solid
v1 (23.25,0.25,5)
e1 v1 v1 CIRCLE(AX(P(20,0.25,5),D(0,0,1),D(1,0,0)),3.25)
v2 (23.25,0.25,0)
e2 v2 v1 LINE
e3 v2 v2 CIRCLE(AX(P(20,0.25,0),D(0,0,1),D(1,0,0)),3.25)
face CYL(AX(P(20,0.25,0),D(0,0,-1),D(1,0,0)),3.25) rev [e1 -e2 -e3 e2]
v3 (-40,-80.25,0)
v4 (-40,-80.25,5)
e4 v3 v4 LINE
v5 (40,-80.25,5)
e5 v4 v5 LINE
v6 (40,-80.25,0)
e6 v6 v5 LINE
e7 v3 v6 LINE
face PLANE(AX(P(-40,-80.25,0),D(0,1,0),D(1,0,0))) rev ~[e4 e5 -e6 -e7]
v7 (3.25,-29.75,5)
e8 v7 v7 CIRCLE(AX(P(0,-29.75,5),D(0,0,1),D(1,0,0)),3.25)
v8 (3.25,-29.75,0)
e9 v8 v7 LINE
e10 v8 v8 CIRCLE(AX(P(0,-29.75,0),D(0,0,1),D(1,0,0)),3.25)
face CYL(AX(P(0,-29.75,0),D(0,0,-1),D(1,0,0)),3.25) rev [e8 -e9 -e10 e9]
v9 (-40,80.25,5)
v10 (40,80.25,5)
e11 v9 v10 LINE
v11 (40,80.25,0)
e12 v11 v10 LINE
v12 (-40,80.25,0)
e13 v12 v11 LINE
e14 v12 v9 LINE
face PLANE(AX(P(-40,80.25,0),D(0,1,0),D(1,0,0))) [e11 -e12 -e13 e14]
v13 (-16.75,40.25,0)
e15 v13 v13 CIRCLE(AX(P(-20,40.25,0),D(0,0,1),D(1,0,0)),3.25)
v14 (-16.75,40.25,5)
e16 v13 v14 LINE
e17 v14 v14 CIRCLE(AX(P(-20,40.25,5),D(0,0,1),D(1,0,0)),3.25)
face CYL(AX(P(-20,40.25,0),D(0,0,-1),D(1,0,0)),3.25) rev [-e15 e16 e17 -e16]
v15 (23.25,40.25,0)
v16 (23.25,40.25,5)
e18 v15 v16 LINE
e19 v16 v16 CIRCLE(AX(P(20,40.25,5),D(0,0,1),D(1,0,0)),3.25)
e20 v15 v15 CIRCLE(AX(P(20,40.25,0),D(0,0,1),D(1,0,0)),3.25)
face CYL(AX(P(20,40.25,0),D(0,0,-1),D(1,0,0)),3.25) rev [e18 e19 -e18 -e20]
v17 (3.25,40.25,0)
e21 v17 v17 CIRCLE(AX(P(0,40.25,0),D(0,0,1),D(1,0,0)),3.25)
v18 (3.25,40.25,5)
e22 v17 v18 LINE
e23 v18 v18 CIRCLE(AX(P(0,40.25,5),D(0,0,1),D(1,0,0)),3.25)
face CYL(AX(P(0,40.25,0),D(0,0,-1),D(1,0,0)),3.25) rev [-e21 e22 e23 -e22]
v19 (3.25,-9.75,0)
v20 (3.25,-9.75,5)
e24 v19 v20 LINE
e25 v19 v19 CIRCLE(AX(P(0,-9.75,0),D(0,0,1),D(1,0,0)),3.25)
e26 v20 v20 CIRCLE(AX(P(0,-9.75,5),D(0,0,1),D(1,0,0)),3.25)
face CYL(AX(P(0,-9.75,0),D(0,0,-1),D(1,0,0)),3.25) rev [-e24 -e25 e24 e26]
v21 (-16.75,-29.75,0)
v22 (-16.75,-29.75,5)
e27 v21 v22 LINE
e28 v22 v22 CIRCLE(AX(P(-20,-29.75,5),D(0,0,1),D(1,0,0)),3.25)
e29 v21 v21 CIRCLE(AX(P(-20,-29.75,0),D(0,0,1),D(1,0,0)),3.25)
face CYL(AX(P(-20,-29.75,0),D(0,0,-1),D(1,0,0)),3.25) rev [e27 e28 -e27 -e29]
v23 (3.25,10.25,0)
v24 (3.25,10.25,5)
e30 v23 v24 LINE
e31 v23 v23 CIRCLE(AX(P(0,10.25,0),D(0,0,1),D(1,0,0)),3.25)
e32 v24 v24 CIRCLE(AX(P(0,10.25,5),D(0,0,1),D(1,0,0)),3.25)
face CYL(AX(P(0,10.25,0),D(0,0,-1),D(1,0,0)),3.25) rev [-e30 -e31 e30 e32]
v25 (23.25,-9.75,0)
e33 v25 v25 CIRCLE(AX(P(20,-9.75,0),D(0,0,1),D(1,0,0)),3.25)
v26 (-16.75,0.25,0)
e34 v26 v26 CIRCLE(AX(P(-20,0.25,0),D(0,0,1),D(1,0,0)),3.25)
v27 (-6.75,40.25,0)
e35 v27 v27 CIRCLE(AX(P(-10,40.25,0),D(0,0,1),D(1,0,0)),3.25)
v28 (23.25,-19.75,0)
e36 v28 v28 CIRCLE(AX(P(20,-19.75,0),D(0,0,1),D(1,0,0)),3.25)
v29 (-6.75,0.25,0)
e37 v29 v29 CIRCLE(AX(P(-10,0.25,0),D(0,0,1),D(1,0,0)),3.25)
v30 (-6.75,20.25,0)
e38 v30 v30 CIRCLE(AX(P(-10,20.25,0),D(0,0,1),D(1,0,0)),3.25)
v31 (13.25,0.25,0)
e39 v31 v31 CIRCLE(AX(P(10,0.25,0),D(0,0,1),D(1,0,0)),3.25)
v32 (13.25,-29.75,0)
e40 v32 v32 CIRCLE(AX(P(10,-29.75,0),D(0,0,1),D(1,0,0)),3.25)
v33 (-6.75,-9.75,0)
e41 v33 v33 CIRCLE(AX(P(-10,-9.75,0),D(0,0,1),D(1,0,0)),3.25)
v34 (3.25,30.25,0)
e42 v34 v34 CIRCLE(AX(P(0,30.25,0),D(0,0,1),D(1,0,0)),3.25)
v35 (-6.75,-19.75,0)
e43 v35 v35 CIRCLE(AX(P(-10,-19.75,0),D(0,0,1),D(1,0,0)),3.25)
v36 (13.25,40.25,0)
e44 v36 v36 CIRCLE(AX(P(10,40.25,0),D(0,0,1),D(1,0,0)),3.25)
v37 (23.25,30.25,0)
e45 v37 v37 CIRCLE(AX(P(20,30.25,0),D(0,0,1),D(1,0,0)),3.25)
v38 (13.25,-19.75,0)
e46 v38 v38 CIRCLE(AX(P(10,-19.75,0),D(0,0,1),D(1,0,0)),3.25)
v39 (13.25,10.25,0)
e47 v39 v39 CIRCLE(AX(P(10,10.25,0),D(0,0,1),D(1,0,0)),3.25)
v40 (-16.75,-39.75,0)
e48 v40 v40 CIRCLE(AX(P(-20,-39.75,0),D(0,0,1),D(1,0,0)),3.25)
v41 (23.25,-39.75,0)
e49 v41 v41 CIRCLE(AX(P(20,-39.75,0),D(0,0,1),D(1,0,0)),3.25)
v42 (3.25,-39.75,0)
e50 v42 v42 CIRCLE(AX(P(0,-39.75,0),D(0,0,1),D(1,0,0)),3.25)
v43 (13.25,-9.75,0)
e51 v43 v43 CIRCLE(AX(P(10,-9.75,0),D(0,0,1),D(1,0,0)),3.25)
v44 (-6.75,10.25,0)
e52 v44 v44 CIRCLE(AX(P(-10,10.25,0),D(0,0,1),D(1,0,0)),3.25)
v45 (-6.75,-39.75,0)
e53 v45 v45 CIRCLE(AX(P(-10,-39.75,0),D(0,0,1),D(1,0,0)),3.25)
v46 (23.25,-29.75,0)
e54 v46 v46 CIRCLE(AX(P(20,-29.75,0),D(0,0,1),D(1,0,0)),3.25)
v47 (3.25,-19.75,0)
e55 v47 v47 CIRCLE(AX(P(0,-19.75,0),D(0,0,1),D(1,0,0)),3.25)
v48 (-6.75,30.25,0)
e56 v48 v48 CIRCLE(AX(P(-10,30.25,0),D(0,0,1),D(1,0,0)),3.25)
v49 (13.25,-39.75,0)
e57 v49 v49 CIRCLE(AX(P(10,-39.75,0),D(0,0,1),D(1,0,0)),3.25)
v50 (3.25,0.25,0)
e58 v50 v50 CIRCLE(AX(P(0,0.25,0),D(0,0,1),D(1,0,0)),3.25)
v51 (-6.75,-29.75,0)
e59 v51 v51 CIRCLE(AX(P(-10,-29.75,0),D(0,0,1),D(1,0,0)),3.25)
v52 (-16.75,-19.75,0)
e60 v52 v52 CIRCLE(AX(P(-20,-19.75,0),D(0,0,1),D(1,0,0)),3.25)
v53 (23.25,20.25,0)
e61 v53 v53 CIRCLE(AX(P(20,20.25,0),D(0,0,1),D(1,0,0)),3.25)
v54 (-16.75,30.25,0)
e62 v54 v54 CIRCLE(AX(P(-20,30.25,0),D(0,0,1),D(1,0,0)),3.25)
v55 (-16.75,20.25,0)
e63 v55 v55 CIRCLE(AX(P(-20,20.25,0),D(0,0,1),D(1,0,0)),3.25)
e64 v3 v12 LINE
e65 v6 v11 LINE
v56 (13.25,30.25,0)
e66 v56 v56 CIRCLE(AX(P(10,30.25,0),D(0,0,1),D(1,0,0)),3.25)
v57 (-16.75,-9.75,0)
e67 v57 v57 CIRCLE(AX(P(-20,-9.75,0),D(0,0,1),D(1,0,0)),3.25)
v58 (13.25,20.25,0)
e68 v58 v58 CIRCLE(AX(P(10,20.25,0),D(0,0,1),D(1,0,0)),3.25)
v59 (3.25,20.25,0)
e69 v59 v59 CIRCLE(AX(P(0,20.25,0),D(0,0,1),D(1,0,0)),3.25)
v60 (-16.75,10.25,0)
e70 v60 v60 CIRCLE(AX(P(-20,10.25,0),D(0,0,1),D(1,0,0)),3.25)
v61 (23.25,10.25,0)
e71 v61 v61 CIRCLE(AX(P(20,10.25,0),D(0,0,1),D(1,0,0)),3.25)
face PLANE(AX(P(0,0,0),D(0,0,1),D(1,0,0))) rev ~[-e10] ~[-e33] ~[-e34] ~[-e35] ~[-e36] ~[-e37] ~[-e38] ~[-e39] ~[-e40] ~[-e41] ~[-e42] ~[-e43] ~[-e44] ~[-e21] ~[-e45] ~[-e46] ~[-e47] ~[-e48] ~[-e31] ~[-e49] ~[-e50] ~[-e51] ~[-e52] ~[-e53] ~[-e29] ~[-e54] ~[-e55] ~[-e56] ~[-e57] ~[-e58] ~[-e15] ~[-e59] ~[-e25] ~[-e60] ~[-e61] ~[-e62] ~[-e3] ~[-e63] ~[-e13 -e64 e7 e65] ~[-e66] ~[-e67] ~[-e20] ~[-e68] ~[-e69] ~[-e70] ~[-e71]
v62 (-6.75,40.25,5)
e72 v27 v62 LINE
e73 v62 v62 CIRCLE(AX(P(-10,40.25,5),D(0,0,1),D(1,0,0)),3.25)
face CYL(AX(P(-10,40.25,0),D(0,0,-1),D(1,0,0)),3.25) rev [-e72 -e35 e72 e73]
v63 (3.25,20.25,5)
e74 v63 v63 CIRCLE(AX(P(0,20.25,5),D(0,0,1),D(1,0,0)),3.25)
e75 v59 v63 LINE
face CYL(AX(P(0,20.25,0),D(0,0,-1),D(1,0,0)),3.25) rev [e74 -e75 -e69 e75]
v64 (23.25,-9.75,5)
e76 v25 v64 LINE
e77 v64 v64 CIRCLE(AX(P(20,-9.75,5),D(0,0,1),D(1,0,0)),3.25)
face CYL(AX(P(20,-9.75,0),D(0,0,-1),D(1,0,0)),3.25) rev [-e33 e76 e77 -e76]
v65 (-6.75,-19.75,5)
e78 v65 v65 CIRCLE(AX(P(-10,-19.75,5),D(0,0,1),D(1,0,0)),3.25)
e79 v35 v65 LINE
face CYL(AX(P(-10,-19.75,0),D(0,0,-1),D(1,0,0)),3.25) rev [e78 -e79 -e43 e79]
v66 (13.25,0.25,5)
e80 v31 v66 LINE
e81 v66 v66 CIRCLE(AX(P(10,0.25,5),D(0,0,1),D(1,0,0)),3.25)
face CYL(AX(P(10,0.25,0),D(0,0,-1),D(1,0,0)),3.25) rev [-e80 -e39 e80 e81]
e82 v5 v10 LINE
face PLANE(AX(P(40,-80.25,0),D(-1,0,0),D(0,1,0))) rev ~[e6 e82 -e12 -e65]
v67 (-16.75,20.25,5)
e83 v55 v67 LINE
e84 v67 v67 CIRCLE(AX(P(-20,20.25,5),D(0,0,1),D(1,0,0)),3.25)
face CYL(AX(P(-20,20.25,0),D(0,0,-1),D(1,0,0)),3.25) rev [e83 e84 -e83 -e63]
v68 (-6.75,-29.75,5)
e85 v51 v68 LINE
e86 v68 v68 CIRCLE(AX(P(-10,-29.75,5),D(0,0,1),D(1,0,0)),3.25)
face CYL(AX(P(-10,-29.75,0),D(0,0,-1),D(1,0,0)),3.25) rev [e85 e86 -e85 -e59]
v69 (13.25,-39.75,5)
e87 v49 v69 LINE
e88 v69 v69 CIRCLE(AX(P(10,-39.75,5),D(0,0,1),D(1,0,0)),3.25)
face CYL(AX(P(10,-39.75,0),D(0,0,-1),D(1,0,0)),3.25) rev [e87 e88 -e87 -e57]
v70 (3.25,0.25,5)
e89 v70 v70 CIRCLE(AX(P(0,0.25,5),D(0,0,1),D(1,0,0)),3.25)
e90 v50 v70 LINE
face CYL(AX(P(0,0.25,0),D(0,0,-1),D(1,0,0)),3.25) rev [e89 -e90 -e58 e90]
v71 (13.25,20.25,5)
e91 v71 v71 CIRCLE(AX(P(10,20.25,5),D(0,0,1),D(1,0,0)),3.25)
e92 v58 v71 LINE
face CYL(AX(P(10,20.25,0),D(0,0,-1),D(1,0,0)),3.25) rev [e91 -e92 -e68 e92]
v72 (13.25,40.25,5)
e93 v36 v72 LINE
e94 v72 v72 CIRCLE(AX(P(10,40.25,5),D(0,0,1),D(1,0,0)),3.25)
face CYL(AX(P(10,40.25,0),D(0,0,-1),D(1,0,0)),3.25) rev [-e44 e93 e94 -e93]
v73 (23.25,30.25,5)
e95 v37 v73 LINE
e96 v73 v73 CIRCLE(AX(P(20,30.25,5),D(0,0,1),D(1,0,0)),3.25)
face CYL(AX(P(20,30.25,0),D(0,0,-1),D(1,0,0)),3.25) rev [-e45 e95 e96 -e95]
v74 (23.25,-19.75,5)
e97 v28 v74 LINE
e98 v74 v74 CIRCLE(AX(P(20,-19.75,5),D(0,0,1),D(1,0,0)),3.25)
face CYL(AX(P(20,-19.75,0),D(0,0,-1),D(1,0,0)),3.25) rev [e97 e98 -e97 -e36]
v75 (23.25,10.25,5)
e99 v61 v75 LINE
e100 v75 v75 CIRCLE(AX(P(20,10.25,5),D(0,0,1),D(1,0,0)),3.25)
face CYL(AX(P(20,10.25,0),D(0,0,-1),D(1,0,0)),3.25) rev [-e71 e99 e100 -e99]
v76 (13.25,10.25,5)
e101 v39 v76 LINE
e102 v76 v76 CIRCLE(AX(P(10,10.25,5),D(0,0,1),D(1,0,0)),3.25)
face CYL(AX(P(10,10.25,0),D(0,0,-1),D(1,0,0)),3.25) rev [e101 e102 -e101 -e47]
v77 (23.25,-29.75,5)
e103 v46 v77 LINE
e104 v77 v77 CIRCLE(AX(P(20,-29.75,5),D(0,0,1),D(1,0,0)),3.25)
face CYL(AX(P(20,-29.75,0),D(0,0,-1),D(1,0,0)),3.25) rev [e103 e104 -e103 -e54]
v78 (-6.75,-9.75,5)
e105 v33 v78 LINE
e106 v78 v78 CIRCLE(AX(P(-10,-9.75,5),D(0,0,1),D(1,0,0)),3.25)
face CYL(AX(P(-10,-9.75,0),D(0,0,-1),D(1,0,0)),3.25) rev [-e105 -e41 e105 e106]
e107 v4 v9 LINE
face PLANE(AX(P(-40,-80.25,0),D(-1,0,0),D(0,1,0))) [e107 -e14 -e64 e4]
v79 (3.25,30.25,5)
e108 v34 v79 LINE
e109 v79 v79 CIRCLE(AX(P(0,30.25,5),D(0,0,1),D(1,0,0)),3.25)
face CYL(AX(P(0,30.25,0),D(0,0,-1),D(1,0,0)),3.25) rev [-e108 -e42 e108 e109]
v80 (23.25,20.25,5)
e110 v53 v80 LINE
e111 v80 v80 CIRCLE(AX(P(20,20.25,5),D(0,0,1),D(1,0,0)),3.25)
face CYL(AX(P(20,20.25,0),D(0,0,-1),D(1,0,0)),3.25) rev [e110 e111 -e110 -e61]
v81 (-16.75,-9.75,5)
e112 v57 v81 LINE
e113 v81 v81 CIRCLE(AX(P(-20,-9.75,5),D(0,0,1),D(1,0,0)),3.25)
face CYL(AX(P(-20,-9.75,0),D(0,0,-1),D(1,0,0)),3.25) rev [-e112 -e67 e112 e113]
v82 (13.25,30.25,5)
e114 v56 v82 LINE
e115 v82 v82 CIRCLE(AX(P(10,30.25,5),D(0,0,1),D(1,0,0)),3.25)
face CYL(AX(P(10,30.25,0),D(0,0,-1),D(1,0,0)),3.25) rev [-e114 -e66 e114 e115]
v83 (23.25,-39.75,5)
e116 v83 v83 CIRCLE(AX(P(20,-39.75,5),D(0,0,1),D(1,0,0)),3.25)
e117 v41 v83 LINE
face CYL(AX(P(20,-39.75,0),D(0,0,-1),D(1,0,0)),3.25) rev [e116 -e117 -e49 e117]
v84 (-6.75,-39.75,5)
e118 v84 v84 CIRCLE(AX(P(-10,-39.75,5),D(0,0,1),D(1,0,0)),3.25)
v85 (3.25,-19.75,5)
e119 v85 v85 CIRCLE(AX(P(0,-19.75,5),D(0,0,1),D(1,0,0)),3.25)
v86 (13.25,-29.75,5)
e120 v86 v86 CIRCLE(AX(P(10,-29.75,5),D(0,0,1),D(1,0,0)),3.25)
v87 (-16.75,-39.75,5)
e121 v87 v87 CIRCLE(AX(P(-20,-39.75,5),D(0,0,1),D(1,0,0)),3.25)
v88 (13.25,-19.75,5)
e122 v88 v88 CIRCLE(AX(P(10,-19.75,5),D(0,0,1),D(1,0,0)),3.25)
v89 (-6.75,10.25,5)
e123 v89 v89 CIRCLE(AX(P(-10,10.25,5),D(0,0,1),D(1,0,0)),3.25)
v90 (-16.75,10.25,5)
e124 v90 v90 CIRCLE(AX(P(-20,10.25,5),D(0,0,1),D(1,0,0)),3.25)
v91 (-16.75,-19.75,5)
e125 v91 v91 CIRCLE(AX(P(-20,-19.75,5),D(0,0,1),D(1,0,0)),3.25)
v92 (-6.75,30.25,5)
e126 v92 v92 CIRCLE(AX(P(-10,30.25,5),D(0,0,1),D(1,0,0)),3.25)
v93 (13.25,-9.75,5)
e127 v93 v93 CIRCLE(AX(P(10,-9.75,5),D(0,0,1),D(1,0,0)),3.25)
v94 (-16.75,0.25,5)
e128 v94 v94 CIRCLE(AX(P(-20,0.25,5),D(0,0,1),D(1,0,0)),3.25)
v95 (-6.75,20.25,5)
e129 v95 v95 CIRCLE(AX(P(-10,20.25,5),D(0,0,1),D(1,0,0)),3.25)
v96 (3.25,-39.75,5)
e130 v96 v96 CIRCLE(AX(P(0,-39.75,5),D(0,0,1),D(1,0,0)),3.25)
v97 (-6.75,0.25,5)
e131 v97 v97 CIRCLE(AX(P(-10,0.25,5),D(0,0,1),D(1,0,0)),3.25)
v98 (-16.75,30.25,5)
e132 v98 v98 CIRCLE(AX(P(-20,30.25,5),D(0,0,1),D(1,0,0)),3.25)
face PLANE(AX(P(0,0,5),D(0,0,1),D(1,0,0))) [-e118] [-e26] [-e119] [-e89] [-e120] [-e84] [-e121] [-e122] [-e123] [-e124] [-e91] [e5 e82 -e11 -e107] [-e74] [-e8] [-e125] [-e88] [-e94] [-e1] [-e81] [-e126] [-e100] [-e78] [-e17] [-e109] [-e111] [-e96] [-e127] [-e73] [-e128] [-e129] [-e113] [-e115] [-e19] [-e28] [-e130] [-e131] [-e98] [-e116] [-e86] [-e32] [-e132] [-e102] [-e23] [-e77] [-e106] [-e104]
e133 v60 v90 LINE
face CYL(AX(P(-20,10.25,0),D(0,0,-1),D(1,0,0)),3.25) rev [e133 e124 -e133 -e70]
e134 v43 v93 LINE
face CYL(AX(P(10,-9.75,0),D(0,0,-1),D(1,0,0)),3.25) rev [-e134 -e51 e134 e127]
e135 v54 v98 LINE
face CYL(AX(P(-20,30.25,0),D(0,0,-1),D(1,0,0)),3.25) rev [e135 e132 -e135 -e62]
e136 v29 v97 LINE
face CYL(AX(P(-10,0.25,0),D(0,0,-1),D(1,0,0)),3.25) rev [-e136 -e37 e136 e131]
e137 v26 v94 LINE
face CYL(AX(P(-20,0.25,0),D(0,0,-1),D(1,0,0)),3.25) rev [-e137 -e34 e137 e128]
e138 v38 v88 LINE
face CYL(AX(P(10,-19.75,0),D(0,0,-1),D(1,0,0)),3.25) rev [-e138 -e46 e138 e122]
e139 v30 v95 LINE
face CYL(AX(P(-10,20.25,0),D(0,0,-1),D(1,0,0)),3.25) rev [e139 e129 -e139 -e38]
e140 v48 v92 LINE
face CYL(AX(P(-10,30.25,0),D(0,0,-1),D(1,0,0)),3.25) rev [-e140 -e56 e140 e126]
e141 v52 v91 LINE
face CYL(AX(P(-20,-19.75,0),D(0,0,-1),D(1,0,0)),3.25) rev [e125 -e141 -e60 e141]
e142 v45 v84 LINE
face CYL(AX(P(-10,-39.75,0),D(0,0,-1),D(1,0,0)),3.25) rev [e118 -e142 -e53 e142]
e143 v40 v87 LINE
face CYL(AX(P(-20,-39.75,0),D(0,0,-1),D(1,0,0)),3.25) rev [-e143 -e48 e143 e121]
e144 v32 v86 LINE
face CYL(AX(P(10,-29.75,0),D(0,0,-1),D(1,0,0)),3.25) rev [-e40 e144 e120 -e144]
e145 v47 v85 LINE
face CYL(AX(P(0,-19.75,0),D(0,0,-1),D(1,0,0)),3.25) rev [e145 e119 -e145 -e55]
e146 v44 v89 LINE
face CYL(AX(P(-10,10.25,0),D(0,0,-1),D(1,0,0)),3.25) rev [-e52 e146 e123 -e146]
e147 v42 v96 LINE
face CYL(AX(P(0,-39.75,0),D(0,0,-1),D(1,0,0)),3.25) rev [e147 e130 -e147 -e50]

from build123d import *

# Parameters (mm, degrees)
F0_W     = 80
F0_H     = 160.5
F0_R     = 3.25
F1_DEPTH = 5


# Not quite as in the source:
# - a feature of the source that left no trace in its solid (it failed there, or was rolled back) is left out


with BuildPart() as f1:
    # F0 (on Top) → F1 (new body)
    with BuildSketch(Plane.XY):
        Rectangle(F0_W, F0_H)
        with Locations((-20, -39.75)):
            Circle(F0_R, mode=Mode.SUBTRACT)
        with Locations((-20, -29.75)):
            Circle(F0_R, mode=Mode.SUBTRACT)
        with Locations((-10, -39.75)):
            Circle(F0_R, mode=Mode.SUBTRACT)
        with Locations((-10, -29.75)):
            Circle(F0_R, mode=Mode.SUBTRACT)
        with Locations((-20, -19.75)):
            Circle(F0_R, mode=Mode.SUBTRACT)
        with Locations((-20, -9.75)):
            Circle(F0_R, mode=Mode.SUBTRACT)
        with Locations((-10, -19.75)):
            Circle(F0_R, mode=Mode.SUBTRACT)
        with Locations((-10, -9.75)):
            Circle(F0_R, mode=Mode.SUBTRACT)
        with Locations((0, -39.75)):
            Circle(F0_R, mode=Mode.SUBTRACT)
        with Locations((0, -29.75)):
            Circle(F0_R, mode=Mode.SUBTRACT)
        with Locations((10, -39.75)):
            Circle(F0_R, mode=Mode.SUBTRACT)
        with Locations((10, -29.75)):
            Circle(F0_R, mode=Mode.SUBTRACT)
        with Locations((0, -19.75)):
            Circle(F0_R, mode=Mode.SUBTRACT)
        with Locations((0, -9.75)):
            Circle(F0_R, mode=Mode.SUBTRACT)
        with Locations((10, -19.75)):
            Circle(F0_R, mode=Mode.SUBTRACT)
        with Locations((10, -9.75)):
            Circle(F0_R, mode=Mode.SUBTRACT)
        with Locations((20, -39.75)):
            Circle(F0_R, mode=Mode.SUBTRACT)
        with Locations((20, -29.75)):
            Circle(F0_R, mode=Mode.SUBTRACT)
        with Locations((20, -19.75)):
            Circle(F0_R, mode=Mode.SUBTRACT)
        with Locations((20, -9.75)):
            Circle(F0_R, mode=Mode.SUBTRACT)
        with Locations((-20, 0.25)):
            Circle(F0_R, mode=Mode.SUBTRACT)
        with Locations((-20, 10.25)):
            Circle(F0_R, mode=Mode.SUBTRACT)
        with Locations((-10, 0.25)):
            Circle(F0_R, mode=Mode.SUBTRACT)
        with Locations((-10, 10.25)):
            Circle(F0_R, mode=Mode.SUBTRACT)
        with Locations((-20, 20.25)):
            Circle(F0_R, mode=Mode.SUBTRACT)
        with Locations((-20, 30.25)):
            Circle(F0_R, mode=Mode.SUBTRACT)
        with Locations((-10, 20.25)):
            Circle(F0_R, mode=Mode.SUBTRACT)
        with Locations((-10, 30.25)):
            Circle(F0_R, mode=Mode.SUBTRACT)
        with Locations((-20, 40.25)):
            Circle(F0_R, mode=Mode.SUBTRACT)
        with Locations((-10, 40.25)):
            Circle(F0_R, mode=Mode.SUBTRACT)
        with Locations((0, 0.25)):
            Circle(F0_R, mode=Mode.SUBTRACT)
        with Locations((0, 10.25)):
            Circle(F0_R, mode=Mode.SUBTRACT)
        with Locations((10, 0.25)):
            Circle(F0_R, mode=Mode.SUBTRACT)
        with Locations((10, 10.25)):
            Circle(F0_R, mode=Mode.SUBTRACT)
        with Locations((0, 20.25)):
            Circle(F0_R, mode=Mode.SUBTRACT)
        with Locations((0, 30.25)):
            Circle(F0_R, mode=Mode.SUBTRACT)
        with Locations((10, 20.25)):
            Circle(F0_R, mode=Mode.SUBTRACT)
        with Locations((10, 30.25)):
            Circle(F0_R, mode=Mode.SUBTRACT)
        with Locations((20, 0.25)):
            Circle(F0_R, mode=Mode.SUBTRACT)
        with Locations((20, 10.25)):
            Circle(F0_R, mode=Mode.SUBTRACT)
        with Locations((20, 20.25)):
            Circle(F0_R, mode=Mode.SUBTRACT)
        with Locations((20, 30.25)):
            Circle(F0_R, mode=Mode.SUBTRACT)
        with Locations((0, 40.25)):
            Circle(F0_R, mode=Mode.SUBTRACT)
        with Locations((10, 40.25)):
            Circle(F0_R, mode=Mode.SUBTRACT)
        with Locations((20, 40.25)):
            Circle(F0_R, mode=Mode.SUBTRACT)
    extrude(amount=F1_DEPTH)


solid = f1.part
